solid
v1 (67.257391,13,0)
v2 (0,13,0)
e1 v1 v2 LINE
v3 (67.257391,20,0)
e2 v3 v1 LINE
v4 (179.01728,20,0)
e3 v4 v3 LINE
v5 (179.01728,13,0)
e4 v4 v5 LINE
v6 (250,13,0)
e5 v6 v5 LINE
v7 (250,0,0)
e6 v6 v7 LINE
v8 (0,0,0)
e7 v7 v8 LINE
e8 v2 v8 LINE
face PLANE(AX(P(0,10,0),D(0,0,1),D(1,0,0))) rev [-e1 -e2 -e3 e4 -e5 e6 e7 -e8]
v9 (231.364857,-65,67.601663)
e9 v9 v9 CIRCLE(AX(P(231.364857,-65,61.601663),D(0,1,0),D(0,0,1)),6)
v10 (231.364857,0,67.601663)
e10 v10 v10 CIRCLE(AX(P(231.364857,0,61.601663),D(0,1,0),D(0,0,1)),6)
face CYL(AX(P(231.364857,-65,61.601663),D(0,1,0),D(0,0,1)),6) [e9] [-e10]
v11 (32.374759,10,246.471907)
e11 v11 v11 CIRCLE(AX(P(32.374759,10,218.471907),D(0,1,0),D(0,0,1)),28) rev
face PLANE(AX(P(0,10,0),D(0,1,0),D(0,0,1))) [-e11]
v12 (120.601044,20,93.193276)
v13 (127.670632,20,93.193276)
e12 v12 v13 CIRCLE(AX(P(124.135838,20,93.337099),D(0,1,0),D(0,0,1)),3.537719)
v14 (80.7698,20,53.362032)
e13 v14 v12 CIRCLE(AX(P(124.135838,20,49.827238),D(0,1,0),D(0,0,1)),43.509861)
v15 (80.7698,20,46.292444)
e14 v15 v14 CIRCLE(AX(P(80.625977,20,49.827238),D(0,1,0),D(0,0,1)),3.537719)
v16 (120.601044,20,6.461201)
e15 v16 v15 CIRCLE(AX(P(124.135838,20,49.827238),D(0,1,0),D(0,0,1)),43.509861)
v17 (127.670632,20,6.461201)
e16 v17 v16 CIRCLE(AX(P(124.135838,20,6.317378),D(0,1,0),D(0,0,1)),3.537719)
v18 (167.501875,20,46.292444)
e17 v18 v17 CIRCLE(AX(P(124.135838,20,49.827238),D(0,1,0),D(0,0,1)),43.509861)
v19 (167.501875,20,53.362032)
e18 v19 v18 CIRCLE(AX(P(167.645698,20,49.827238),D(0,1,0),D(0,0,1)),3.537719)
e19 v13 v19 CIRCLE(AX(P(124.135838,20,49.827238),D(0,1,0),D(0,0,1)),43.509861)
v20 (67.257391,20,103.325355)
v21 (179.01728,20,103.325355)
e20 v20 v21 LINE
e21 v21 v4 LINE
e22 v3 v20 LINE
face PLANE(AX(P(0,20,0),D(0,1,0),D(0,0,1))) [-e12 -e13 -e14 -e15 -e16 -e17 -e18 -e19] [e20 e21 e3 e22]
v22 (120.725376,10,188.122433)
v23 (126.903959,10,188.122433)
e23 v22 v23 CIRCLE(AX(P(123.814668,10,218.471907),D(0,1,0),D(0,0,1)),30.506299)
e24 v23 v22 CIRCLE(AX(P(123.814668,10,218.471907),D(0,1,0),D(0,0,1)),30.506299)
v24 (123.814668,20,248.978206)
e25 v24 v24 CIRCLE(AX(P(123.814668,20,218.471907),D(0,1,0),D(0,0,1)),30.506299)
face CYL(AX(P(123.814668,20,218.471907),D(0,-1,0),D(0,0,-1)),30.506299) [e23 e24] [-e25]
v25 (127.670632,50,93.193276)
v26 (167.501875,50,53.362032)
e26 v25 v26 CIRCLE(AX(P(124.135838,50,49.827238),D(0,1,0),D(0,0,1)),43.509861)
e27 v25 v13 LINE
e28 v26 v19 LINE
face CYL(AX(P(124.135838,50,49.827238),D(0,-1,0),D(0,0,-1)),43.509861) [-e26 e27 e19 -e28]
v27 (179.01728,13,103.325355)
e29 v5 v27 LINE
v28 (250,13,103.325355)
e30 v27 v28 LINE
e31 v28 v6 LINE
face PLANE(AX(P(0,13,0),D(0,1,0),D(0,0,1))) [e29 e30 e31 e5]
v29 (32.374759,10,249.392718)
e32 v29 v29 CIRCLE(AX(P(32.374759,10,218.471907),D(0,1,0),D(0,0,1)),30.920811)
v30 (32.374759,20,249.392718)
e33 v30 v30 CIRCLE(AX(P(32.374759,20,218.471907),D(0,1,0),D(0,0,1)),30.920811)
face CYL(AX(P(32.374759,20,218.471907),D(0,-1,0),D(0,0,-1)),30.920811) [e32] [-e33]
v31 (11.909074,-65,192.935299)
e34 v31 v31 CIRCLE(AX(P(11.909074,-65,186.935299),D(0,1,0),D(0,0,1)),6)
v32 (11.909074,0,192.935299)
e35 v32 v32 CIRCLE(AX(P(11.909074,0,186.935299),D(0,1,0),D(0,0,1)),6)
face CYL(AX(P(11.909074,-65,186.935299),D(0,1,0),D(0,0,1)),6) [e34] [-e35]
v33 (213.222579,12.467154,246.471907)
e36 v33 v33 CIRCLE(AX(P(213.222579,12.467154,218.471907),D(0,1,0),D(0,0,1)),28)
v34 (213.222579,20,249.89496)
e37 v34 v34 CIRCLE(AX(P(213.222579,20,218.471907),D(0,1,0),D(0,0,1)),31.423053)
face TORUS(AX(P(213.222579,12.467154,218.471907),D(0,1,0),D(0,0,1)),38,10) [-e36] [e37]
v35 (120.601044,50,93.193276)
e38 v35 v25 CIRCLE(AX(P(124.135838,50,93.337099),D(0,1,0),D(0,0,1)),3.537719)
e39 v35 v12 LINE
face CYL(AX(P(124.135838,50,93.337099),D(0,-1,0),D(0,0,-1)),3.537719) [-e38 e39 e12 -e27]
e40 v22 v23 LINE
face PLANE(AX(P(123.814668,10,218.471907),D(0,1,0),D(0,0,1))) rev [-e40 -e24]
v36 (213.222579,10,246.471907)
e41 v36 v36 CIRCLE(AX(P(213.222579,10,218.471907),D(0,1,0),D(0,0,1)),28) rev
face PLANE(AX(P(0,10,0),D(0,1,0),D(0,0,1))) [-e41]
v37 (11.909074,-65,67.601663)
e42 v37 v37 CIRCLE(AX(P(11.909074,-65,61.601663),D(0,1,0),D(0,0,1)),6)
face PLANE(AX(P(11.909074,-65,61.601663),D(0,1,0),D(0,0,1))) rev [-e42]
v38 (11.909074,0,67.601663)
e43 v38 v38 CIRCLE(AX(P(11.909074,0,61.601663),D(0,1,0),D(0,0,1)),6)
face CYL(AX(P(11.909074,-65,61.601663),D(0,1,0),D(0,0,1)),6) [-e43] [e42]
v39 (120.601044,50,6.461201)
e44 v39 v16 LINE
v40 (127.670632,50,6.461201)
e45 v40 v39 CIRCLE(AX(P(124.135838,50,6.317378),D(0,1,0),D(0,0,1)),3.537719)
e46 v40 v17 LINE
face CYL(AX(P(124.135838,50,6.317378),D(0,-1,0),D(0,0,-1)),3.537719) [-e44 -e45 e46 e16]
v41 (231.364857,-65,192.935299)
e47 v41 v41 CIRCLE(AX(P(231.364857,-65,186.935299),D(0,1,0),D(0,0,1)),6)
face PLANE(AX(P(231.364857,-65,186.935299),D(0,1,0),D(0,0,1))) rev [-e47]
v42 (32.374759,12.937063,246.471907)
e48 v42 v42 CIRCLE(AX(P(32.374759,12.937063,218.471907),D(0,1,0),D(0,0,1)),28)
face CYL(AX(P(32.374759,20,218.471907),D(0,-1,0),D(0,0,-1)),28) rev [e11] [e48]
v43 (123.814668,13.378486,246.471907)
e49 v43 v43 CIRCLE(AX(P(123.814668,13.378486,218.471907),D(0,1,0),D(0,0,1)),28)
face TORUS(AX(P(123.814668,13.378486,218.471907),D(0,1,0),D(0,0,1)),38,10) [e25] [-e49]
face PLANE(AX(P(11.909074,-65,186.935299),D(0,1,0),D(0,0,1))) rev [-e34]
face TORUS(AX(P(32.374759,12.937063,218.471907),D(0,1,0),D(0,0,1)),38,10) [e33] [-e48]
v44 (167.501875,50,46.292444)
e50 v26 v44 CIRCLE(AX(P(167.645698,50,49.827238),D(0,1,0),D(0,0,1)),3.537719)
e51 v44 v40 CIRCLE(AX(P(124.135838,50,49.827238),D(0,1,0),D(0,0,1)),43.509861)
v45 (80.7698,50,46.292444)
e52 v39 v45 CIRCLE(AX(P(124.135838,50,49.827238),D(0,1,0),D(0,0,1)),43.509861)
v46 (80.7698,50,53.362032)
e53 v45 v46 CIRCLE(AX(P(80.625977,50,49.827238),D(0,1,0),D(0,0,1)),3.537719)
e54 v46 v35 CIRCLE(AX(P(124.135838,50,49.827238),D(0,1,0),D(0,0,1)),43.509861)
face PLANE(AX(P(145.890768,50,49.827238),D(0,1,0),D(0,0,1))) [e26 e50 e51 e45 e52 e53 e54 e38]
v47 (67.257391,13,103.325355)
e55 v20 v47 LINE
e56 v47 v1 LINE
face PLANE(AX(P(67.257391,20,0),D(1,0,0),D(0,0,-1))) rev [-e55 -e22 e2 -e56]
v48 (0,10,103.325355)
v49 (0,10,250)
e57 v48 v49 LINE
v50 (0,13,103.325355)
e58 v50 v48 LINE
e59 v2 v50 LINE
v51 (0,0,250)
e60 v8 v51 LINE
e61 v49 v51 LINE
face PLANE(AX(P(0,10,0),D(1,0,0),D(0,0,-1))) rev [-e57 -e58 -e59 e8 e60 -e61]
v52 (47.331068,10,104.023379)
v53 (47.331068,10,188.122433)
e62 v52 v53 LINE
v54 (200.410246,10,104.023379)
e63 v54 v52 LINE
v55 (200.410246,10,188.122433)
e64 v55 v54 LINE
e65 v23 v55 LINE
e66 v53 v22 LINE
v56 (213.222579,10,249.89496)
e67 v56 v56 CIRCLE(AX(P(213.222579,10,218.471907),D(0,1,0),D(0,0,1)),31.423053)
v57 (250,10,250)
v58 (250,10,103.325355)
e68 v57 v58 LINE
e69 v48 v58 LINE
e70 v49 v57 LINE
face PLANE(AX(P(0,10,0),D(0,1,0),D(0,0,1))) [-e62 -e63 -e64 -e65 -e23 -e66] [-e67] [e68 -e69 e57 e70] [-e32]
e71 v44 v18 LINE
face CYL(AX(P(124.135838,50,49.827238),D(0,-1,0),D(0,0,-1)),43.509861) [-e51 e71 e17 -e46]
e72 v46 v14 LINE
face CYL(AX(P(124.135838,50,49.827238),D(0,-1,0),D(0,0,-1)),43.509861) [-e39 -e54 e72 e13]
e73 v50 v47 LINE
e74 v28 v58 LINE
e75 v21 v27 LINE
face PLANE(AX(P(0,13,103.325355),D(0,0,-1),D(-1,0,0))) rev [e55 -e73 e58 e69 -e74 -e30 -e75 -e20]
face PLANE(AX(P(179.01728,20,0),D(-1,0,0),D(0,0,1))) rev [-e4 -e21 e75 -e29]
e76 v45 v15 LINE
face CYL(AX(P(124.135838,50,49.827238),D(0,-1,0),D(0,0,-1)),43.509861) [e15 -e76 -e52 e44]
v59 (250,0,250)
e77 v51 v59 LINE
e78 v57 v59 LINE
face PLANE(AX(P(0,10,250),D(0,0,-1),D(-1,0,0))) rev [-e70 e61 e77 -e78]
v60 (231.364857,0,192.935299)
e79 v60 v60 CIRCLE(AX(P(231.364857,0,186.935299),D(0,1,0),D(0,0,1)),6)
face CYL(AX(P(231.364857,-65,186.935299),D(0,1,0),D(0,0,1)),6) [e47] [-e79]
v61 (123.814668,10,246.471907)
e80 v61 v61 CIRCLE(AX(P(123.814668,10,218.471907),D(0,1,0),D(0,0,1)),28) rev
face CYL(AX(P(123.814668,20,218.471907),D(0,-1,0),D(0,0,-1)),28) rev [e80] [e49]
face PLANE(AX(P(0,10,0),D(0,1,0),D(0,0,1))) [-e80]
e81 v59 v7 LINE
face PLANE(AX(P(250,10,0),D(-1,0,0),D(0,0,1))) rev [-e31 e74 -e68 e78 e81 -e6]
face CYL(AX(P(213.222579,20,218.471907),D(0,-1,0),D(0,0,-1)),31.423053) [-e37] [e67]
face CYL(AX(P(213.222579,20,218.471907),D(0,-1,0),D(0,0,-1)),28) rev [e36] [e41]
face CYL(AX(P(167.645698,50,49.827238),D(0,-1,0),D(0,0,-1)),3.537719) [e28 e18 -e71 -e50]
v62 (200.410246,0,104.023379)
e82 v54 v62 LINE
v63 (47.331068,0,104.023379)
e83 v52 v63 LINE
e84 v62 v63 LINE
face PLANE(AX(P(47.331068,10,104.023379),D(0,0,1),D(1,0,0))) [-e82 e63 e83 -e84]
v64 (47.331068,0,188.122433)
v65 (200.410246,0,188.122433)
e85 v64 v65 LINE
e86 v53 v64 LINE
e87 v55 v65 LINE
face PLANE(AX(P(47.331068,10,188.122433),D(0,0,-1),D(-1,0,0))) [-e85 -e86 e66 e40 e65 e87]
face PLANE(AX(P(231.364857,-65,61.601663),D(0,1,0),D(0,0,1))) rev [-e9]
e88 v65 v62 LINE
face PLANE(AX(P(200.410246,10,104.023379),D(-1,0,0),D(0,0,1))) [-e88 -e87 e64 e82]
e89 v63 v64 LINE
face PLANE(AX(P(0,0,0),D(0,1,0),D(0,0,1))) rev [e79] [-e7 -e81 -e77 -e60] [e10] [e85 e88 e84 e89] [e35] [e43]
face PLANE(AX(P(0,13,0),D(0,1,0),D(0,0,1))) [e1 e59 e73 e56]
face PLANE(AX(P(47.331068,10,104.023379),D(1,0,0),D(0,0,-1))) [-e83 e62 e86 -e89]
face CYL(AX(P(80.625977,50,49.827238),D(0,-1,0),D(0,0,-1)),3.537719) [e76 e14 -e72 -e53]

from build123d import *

# Parameters (mm, degrees)
SKETCH_3_W      = 153.07917742657742
SKETCH_3_H      = 84.09905426521841
EXTRUDE_3_DEPTH = 10
SKETCH_4_R      = 5.999999999999998
SKETCH_4_R_2    = 6.000000000000017
SKETCH_4_R_3    = 6
EXTRUDE_4_DEPTH = 65
SKETCH_5_R      = 30.920810944079943
SKETCH_5_R_2    = 27.999999999999996
SKETCH_5_R_3    = 30.50629910833158
SKETCH_5_R_4    = 31.42305288564662
EXTRUDE_5_DEPTH = 10
FILLET_1_R      = 10
SKETCH_6_W      = 249.99999999999997
SKETCH_6_H      = 103.3253548332911
EXTRUDE_6_DEPTH = 3
SKETCH_7_W      = 111.7598891408415
SKETCH_7_H      = 103.3253548332911
EXTRUDE_7_DEPTH = 20
EXTRUDE_8_DEPTH = 30


with BuildPart() as part:
    # 草图3 → 凸台-拉伸3 (new body)
    with BuildSketch(Plane(origin=(0, 0, 0), x_dir=(1, 0, 0), z_dir=(0, 1, 0))):
        Polygon((0, 0), (249.99999999999997, 0), (249.99999999999997, -249.99999999999997), (3.062e-14, -249.99999999999997), align=None)
        with Locations((123.87065697506361, -146.07290630710244)):
            Rectangle(SKETCH_3_W, SKETCH_3_H, mode=Mode.SUBTRACT)
    extrude(amount=EXTRUDE_3_DEPTH)

    # 草图4 → 凸台-拉伸4 (add)
    with BuildSketch(Plane(origin=(0, 0, 0), x_dir=(1, 0, 0), z_dir=(0, 1, 0))):
        with Locations(Location((11.90907445269146, -61.60166288737722, 0), (0, 0, 270))):
            Circle(SKETCH_4_R)
        with Locations(Location((231.3648567656165, -61.60166288737722, 0), (0, 0, 270))):
            Circle(SKETCH_4_R_2)
        with Locations(Location((231.3648567656165, -186.93529856387, 0), (0, 0, 270))):
            Circle(SKETCH_4_R_2)
        with Locations(Location((11.90907445269146, -186.93529856387, 0), (0, 0, 270))):
            Circle(SKETCH_4_R_3)
    extrude(amount=-EXTRUDE_4_DEPTH)

    # 草图5 → 凸台-拉伸5 (add)
    # profile 1 of 3: a face of its own
    with BuildSketch(Plane(origin=(0, 10, 0), x_dir=(1, 0, 0), z_dir=(0, 1, 0))):
        with Locations(Location((32.374758545393455, -218.47190728143076, 0), (0, 0, 270))):
            Circle(SKETCH_5_R)
        with Locations(Location((32.374758545393455, -218.47190728143076, 0), (0, 0, 270))):
            Circle(SKETCH_5_R_2, mode=Mode.SUBTRACT)
    # profile 2 of 3: a face of its own
    with BuildSketch(Plane(origin=(0, 10, 0), x_dir=(1, 0, 0), z_dir=(0, 1, 0))):
        with Locations(Location((123.8146678424456, -218.47190728143076, 0), (0, 0, 84.187846026))):
            Circle(SKETCH_5_R_3)
        with Locations(Location((123.8146678424456, -218.47190728143076, 0), (0, 0, 270))):
            Circle(SKETCH_5_R_2, mode=Mode.SUBTRACT)
    # profile 3 of 3: a face of its own
    with BuildSketch(Plane(origin=(0, 10, 0), x_dir=(1, 0, 0), z_dir=(0, 1, 0))):
        with Locations(Location((213.22257915511878, -218.47190728143076, 0), (0, 0, 270))):
            Circle(SKETCH_5_R_4)
        with Locations(Location((213.22257915511878, -218.47190728143076, 0), (0, 0, 270))):
            Circle(SKETCH_5_R_2, mode=Mode.SUBTRACT)
    extrude(amount=EXTRUDE_5_DEPTH)

    # 圆角1
    # the kernel refuses this fillet: 10 mm, written as the material it takes off along each edge
    with BuildSketch(Plane(origin=(32.374758545393455, 20, 218.47190728143076), x_dir=(-2.5e-16, 0, 1), z_dir=(-1, 0, -2.5e-16))) as fillet_1_piece_1:
        with BuildLine():
            CenterArc((37.99999999999997, -7.062937229690062), FILLET_1_R, 135.06584304394207, 44.93415695605793)
            Line((27.99999999999997, -7.062937229690062), (27.799999999999983, -7.062937229690062))
            Line((27.799999999999983, -7.062937229690062), (27.80000000000001, 0))
            Line((27.80000000000001, 0), (28, 0.1999999999999993))
            ThreePointArc((28, 0.1999999999999993), (29.46040547203998, 0.1999999999999993), (30.77922716296152, 0.14125874459380228))
            Line((30.77922716296152, 0.14125874459380228), (30.920810944079932, 0))
        make_face()
    revolve(axis=Axis((32.374758545393455, 20, 218.47190728143076), (0, 1, 0)), mode=Mode.SUBTRACT)
    with BuildSketch(Plane(origin=(123.8146678424456, 20, 218.47190728143076), x_dir=(0, 0, 1), z_dir=(-1, 0, 0))) as fillet_1_piece_2:
        with BuildLine():
            CenterArc((37.99999999999997, -6.621513946689863), FILLET_1_R, 138.53584249731082, 41.464157502689176)
            Line((27.99999999999997, -6.621513946689863), (27.799999999999983, -6.621513946689863))
            Line((27.799999999999983, -6.621513946689863), (27.80000000000001, 0))
            Line((27.80000000000001, 0), (28, 0.1999999999999993))
            ThreePointArc((28, 0.1999999999999993), (29.253149554165788, 0.1999999999999993), (30.35642509049822, 0.13243027893379278))
            Line((30.35642509049822, 0.13243027893379278), (30.506299108331575, -3.55e-15))
        make_face()
    revolve(axis=Axis((123.8146678424456, 20, 218.47190728143076), (0, 1, 0)), mode=Mode.SUBTRACT)
    with BuildSketch(Plane(origin=(213.22257915511878, 20, 218.47190728143076), x_dir=(0, 0, 1), z_dir=(-1, 0, 0))) as fillet_1_piece_3:
        with BuildLine():
            CenterArc((37.99999999999997, -7.53284585365977), FILLET_1_R, 131.1242944649221, 48.87570553507791)
            Line((27.99999999999997, -7.53284585365977), (27.799999999999983, -7.53284585365977))
            Line((27.799999999999983, -7.53284585365977), (27.80000000000001, 0))
            Line((27.80000000000001, 0), (28, 0.1999999999999993))
            ThreePointArc((28, 0.1999999999999993), (29.711526442823327, 0.1999999999999993), (31.291513943359547, 0.15065691707319573))
            Line((31.291513943359547, 0.15065691707319573), (31.423052885646626, 0))
        make_face()
    revolve(axis=Axis((213.22257915511878, 20, 218.47190728143076), (0, 1, 0)), mode=Mode.SUBTRACT)

    # 草图6 → 凸台-拉伸6 (add)
    with BuildSketch(Plane(origin=(0, 10, 0), x_dir=(1, 0, 0), z_dir=(0, 1, 0))):
        with Locations((124.99999999999999, -51.66267741664555)):
            Rectangle(SKETCH_6_W, SKETCH_6_H)
    extrude(amount=EXTRUDE_6_DEPTH)

    # 草图7 → 凸台-拉伸7 (add)
    with BuildSketch(Plane(origin=(0, 0, 0), x_dir=(1, 0, 0), z_dir=(0, 1, 0))):
        with Locations((123.13733518098593, -51.66267741664555)):
            Rectangle(SKETCH_7_W, SKETCH_7_H)
    extrude(amount=EXTRUDE_7_DEPTH)

    # 草图8 → 凸台-拉伸8 (add)
    with BuildSketch(Plane(origin=(0, 20, 0), x_dir=(1, 0, 0), z_dir=(0, 1, 0))):
        with BuildLine():
            ThreePointArc((80.76980033741471, -53.36203223162917), (93.36972027799136, -80.59335577239693), (120.60104381875912, -93.19327571297359))
            ThreePointArc((120.60104381875912, -93.19327571297359), (124.13583776377907, -96.87481756004797), (127.670631708799, -93.19327571297359))
            ThreePointArc((127.670631708799, -93.19327571297359), (154.90195524956675, -80.59335577239695), (167.50187519014344, -53.3620322316292))
            ThreePointArc((167.50187519014344, -53.3620322316292), (171.18341703721785, -49.82723828660922), (167.50187519014344, -46.29244434158925))
            ThreePointArc((167.50187519014344, -46.29244434158925), (154.90195524956675, -19.06112080082149), (127.670631708799, -6.461200860244869))
            ThreePointArc((127.670631708799, -6.461200860244869), (124.13583776377907, -2.779659013170473), (120.60104381875912, -6.461200860244869))
            ThreePointArc((120.60104381875912, -6.461200860244869), (93.36972027799136, -19.061120800821513), (80.76980033741471, -46.29244434158928))
            ThreePointArc((80.76980033741471, -46.29244434158928), (77.08825849034031, -49.82723828660922), (80.76980033741471, -53.36203223162917))
        make_face()
    extrude(amount=EXTRUDE_8_DEPTH)


solid = part.part
